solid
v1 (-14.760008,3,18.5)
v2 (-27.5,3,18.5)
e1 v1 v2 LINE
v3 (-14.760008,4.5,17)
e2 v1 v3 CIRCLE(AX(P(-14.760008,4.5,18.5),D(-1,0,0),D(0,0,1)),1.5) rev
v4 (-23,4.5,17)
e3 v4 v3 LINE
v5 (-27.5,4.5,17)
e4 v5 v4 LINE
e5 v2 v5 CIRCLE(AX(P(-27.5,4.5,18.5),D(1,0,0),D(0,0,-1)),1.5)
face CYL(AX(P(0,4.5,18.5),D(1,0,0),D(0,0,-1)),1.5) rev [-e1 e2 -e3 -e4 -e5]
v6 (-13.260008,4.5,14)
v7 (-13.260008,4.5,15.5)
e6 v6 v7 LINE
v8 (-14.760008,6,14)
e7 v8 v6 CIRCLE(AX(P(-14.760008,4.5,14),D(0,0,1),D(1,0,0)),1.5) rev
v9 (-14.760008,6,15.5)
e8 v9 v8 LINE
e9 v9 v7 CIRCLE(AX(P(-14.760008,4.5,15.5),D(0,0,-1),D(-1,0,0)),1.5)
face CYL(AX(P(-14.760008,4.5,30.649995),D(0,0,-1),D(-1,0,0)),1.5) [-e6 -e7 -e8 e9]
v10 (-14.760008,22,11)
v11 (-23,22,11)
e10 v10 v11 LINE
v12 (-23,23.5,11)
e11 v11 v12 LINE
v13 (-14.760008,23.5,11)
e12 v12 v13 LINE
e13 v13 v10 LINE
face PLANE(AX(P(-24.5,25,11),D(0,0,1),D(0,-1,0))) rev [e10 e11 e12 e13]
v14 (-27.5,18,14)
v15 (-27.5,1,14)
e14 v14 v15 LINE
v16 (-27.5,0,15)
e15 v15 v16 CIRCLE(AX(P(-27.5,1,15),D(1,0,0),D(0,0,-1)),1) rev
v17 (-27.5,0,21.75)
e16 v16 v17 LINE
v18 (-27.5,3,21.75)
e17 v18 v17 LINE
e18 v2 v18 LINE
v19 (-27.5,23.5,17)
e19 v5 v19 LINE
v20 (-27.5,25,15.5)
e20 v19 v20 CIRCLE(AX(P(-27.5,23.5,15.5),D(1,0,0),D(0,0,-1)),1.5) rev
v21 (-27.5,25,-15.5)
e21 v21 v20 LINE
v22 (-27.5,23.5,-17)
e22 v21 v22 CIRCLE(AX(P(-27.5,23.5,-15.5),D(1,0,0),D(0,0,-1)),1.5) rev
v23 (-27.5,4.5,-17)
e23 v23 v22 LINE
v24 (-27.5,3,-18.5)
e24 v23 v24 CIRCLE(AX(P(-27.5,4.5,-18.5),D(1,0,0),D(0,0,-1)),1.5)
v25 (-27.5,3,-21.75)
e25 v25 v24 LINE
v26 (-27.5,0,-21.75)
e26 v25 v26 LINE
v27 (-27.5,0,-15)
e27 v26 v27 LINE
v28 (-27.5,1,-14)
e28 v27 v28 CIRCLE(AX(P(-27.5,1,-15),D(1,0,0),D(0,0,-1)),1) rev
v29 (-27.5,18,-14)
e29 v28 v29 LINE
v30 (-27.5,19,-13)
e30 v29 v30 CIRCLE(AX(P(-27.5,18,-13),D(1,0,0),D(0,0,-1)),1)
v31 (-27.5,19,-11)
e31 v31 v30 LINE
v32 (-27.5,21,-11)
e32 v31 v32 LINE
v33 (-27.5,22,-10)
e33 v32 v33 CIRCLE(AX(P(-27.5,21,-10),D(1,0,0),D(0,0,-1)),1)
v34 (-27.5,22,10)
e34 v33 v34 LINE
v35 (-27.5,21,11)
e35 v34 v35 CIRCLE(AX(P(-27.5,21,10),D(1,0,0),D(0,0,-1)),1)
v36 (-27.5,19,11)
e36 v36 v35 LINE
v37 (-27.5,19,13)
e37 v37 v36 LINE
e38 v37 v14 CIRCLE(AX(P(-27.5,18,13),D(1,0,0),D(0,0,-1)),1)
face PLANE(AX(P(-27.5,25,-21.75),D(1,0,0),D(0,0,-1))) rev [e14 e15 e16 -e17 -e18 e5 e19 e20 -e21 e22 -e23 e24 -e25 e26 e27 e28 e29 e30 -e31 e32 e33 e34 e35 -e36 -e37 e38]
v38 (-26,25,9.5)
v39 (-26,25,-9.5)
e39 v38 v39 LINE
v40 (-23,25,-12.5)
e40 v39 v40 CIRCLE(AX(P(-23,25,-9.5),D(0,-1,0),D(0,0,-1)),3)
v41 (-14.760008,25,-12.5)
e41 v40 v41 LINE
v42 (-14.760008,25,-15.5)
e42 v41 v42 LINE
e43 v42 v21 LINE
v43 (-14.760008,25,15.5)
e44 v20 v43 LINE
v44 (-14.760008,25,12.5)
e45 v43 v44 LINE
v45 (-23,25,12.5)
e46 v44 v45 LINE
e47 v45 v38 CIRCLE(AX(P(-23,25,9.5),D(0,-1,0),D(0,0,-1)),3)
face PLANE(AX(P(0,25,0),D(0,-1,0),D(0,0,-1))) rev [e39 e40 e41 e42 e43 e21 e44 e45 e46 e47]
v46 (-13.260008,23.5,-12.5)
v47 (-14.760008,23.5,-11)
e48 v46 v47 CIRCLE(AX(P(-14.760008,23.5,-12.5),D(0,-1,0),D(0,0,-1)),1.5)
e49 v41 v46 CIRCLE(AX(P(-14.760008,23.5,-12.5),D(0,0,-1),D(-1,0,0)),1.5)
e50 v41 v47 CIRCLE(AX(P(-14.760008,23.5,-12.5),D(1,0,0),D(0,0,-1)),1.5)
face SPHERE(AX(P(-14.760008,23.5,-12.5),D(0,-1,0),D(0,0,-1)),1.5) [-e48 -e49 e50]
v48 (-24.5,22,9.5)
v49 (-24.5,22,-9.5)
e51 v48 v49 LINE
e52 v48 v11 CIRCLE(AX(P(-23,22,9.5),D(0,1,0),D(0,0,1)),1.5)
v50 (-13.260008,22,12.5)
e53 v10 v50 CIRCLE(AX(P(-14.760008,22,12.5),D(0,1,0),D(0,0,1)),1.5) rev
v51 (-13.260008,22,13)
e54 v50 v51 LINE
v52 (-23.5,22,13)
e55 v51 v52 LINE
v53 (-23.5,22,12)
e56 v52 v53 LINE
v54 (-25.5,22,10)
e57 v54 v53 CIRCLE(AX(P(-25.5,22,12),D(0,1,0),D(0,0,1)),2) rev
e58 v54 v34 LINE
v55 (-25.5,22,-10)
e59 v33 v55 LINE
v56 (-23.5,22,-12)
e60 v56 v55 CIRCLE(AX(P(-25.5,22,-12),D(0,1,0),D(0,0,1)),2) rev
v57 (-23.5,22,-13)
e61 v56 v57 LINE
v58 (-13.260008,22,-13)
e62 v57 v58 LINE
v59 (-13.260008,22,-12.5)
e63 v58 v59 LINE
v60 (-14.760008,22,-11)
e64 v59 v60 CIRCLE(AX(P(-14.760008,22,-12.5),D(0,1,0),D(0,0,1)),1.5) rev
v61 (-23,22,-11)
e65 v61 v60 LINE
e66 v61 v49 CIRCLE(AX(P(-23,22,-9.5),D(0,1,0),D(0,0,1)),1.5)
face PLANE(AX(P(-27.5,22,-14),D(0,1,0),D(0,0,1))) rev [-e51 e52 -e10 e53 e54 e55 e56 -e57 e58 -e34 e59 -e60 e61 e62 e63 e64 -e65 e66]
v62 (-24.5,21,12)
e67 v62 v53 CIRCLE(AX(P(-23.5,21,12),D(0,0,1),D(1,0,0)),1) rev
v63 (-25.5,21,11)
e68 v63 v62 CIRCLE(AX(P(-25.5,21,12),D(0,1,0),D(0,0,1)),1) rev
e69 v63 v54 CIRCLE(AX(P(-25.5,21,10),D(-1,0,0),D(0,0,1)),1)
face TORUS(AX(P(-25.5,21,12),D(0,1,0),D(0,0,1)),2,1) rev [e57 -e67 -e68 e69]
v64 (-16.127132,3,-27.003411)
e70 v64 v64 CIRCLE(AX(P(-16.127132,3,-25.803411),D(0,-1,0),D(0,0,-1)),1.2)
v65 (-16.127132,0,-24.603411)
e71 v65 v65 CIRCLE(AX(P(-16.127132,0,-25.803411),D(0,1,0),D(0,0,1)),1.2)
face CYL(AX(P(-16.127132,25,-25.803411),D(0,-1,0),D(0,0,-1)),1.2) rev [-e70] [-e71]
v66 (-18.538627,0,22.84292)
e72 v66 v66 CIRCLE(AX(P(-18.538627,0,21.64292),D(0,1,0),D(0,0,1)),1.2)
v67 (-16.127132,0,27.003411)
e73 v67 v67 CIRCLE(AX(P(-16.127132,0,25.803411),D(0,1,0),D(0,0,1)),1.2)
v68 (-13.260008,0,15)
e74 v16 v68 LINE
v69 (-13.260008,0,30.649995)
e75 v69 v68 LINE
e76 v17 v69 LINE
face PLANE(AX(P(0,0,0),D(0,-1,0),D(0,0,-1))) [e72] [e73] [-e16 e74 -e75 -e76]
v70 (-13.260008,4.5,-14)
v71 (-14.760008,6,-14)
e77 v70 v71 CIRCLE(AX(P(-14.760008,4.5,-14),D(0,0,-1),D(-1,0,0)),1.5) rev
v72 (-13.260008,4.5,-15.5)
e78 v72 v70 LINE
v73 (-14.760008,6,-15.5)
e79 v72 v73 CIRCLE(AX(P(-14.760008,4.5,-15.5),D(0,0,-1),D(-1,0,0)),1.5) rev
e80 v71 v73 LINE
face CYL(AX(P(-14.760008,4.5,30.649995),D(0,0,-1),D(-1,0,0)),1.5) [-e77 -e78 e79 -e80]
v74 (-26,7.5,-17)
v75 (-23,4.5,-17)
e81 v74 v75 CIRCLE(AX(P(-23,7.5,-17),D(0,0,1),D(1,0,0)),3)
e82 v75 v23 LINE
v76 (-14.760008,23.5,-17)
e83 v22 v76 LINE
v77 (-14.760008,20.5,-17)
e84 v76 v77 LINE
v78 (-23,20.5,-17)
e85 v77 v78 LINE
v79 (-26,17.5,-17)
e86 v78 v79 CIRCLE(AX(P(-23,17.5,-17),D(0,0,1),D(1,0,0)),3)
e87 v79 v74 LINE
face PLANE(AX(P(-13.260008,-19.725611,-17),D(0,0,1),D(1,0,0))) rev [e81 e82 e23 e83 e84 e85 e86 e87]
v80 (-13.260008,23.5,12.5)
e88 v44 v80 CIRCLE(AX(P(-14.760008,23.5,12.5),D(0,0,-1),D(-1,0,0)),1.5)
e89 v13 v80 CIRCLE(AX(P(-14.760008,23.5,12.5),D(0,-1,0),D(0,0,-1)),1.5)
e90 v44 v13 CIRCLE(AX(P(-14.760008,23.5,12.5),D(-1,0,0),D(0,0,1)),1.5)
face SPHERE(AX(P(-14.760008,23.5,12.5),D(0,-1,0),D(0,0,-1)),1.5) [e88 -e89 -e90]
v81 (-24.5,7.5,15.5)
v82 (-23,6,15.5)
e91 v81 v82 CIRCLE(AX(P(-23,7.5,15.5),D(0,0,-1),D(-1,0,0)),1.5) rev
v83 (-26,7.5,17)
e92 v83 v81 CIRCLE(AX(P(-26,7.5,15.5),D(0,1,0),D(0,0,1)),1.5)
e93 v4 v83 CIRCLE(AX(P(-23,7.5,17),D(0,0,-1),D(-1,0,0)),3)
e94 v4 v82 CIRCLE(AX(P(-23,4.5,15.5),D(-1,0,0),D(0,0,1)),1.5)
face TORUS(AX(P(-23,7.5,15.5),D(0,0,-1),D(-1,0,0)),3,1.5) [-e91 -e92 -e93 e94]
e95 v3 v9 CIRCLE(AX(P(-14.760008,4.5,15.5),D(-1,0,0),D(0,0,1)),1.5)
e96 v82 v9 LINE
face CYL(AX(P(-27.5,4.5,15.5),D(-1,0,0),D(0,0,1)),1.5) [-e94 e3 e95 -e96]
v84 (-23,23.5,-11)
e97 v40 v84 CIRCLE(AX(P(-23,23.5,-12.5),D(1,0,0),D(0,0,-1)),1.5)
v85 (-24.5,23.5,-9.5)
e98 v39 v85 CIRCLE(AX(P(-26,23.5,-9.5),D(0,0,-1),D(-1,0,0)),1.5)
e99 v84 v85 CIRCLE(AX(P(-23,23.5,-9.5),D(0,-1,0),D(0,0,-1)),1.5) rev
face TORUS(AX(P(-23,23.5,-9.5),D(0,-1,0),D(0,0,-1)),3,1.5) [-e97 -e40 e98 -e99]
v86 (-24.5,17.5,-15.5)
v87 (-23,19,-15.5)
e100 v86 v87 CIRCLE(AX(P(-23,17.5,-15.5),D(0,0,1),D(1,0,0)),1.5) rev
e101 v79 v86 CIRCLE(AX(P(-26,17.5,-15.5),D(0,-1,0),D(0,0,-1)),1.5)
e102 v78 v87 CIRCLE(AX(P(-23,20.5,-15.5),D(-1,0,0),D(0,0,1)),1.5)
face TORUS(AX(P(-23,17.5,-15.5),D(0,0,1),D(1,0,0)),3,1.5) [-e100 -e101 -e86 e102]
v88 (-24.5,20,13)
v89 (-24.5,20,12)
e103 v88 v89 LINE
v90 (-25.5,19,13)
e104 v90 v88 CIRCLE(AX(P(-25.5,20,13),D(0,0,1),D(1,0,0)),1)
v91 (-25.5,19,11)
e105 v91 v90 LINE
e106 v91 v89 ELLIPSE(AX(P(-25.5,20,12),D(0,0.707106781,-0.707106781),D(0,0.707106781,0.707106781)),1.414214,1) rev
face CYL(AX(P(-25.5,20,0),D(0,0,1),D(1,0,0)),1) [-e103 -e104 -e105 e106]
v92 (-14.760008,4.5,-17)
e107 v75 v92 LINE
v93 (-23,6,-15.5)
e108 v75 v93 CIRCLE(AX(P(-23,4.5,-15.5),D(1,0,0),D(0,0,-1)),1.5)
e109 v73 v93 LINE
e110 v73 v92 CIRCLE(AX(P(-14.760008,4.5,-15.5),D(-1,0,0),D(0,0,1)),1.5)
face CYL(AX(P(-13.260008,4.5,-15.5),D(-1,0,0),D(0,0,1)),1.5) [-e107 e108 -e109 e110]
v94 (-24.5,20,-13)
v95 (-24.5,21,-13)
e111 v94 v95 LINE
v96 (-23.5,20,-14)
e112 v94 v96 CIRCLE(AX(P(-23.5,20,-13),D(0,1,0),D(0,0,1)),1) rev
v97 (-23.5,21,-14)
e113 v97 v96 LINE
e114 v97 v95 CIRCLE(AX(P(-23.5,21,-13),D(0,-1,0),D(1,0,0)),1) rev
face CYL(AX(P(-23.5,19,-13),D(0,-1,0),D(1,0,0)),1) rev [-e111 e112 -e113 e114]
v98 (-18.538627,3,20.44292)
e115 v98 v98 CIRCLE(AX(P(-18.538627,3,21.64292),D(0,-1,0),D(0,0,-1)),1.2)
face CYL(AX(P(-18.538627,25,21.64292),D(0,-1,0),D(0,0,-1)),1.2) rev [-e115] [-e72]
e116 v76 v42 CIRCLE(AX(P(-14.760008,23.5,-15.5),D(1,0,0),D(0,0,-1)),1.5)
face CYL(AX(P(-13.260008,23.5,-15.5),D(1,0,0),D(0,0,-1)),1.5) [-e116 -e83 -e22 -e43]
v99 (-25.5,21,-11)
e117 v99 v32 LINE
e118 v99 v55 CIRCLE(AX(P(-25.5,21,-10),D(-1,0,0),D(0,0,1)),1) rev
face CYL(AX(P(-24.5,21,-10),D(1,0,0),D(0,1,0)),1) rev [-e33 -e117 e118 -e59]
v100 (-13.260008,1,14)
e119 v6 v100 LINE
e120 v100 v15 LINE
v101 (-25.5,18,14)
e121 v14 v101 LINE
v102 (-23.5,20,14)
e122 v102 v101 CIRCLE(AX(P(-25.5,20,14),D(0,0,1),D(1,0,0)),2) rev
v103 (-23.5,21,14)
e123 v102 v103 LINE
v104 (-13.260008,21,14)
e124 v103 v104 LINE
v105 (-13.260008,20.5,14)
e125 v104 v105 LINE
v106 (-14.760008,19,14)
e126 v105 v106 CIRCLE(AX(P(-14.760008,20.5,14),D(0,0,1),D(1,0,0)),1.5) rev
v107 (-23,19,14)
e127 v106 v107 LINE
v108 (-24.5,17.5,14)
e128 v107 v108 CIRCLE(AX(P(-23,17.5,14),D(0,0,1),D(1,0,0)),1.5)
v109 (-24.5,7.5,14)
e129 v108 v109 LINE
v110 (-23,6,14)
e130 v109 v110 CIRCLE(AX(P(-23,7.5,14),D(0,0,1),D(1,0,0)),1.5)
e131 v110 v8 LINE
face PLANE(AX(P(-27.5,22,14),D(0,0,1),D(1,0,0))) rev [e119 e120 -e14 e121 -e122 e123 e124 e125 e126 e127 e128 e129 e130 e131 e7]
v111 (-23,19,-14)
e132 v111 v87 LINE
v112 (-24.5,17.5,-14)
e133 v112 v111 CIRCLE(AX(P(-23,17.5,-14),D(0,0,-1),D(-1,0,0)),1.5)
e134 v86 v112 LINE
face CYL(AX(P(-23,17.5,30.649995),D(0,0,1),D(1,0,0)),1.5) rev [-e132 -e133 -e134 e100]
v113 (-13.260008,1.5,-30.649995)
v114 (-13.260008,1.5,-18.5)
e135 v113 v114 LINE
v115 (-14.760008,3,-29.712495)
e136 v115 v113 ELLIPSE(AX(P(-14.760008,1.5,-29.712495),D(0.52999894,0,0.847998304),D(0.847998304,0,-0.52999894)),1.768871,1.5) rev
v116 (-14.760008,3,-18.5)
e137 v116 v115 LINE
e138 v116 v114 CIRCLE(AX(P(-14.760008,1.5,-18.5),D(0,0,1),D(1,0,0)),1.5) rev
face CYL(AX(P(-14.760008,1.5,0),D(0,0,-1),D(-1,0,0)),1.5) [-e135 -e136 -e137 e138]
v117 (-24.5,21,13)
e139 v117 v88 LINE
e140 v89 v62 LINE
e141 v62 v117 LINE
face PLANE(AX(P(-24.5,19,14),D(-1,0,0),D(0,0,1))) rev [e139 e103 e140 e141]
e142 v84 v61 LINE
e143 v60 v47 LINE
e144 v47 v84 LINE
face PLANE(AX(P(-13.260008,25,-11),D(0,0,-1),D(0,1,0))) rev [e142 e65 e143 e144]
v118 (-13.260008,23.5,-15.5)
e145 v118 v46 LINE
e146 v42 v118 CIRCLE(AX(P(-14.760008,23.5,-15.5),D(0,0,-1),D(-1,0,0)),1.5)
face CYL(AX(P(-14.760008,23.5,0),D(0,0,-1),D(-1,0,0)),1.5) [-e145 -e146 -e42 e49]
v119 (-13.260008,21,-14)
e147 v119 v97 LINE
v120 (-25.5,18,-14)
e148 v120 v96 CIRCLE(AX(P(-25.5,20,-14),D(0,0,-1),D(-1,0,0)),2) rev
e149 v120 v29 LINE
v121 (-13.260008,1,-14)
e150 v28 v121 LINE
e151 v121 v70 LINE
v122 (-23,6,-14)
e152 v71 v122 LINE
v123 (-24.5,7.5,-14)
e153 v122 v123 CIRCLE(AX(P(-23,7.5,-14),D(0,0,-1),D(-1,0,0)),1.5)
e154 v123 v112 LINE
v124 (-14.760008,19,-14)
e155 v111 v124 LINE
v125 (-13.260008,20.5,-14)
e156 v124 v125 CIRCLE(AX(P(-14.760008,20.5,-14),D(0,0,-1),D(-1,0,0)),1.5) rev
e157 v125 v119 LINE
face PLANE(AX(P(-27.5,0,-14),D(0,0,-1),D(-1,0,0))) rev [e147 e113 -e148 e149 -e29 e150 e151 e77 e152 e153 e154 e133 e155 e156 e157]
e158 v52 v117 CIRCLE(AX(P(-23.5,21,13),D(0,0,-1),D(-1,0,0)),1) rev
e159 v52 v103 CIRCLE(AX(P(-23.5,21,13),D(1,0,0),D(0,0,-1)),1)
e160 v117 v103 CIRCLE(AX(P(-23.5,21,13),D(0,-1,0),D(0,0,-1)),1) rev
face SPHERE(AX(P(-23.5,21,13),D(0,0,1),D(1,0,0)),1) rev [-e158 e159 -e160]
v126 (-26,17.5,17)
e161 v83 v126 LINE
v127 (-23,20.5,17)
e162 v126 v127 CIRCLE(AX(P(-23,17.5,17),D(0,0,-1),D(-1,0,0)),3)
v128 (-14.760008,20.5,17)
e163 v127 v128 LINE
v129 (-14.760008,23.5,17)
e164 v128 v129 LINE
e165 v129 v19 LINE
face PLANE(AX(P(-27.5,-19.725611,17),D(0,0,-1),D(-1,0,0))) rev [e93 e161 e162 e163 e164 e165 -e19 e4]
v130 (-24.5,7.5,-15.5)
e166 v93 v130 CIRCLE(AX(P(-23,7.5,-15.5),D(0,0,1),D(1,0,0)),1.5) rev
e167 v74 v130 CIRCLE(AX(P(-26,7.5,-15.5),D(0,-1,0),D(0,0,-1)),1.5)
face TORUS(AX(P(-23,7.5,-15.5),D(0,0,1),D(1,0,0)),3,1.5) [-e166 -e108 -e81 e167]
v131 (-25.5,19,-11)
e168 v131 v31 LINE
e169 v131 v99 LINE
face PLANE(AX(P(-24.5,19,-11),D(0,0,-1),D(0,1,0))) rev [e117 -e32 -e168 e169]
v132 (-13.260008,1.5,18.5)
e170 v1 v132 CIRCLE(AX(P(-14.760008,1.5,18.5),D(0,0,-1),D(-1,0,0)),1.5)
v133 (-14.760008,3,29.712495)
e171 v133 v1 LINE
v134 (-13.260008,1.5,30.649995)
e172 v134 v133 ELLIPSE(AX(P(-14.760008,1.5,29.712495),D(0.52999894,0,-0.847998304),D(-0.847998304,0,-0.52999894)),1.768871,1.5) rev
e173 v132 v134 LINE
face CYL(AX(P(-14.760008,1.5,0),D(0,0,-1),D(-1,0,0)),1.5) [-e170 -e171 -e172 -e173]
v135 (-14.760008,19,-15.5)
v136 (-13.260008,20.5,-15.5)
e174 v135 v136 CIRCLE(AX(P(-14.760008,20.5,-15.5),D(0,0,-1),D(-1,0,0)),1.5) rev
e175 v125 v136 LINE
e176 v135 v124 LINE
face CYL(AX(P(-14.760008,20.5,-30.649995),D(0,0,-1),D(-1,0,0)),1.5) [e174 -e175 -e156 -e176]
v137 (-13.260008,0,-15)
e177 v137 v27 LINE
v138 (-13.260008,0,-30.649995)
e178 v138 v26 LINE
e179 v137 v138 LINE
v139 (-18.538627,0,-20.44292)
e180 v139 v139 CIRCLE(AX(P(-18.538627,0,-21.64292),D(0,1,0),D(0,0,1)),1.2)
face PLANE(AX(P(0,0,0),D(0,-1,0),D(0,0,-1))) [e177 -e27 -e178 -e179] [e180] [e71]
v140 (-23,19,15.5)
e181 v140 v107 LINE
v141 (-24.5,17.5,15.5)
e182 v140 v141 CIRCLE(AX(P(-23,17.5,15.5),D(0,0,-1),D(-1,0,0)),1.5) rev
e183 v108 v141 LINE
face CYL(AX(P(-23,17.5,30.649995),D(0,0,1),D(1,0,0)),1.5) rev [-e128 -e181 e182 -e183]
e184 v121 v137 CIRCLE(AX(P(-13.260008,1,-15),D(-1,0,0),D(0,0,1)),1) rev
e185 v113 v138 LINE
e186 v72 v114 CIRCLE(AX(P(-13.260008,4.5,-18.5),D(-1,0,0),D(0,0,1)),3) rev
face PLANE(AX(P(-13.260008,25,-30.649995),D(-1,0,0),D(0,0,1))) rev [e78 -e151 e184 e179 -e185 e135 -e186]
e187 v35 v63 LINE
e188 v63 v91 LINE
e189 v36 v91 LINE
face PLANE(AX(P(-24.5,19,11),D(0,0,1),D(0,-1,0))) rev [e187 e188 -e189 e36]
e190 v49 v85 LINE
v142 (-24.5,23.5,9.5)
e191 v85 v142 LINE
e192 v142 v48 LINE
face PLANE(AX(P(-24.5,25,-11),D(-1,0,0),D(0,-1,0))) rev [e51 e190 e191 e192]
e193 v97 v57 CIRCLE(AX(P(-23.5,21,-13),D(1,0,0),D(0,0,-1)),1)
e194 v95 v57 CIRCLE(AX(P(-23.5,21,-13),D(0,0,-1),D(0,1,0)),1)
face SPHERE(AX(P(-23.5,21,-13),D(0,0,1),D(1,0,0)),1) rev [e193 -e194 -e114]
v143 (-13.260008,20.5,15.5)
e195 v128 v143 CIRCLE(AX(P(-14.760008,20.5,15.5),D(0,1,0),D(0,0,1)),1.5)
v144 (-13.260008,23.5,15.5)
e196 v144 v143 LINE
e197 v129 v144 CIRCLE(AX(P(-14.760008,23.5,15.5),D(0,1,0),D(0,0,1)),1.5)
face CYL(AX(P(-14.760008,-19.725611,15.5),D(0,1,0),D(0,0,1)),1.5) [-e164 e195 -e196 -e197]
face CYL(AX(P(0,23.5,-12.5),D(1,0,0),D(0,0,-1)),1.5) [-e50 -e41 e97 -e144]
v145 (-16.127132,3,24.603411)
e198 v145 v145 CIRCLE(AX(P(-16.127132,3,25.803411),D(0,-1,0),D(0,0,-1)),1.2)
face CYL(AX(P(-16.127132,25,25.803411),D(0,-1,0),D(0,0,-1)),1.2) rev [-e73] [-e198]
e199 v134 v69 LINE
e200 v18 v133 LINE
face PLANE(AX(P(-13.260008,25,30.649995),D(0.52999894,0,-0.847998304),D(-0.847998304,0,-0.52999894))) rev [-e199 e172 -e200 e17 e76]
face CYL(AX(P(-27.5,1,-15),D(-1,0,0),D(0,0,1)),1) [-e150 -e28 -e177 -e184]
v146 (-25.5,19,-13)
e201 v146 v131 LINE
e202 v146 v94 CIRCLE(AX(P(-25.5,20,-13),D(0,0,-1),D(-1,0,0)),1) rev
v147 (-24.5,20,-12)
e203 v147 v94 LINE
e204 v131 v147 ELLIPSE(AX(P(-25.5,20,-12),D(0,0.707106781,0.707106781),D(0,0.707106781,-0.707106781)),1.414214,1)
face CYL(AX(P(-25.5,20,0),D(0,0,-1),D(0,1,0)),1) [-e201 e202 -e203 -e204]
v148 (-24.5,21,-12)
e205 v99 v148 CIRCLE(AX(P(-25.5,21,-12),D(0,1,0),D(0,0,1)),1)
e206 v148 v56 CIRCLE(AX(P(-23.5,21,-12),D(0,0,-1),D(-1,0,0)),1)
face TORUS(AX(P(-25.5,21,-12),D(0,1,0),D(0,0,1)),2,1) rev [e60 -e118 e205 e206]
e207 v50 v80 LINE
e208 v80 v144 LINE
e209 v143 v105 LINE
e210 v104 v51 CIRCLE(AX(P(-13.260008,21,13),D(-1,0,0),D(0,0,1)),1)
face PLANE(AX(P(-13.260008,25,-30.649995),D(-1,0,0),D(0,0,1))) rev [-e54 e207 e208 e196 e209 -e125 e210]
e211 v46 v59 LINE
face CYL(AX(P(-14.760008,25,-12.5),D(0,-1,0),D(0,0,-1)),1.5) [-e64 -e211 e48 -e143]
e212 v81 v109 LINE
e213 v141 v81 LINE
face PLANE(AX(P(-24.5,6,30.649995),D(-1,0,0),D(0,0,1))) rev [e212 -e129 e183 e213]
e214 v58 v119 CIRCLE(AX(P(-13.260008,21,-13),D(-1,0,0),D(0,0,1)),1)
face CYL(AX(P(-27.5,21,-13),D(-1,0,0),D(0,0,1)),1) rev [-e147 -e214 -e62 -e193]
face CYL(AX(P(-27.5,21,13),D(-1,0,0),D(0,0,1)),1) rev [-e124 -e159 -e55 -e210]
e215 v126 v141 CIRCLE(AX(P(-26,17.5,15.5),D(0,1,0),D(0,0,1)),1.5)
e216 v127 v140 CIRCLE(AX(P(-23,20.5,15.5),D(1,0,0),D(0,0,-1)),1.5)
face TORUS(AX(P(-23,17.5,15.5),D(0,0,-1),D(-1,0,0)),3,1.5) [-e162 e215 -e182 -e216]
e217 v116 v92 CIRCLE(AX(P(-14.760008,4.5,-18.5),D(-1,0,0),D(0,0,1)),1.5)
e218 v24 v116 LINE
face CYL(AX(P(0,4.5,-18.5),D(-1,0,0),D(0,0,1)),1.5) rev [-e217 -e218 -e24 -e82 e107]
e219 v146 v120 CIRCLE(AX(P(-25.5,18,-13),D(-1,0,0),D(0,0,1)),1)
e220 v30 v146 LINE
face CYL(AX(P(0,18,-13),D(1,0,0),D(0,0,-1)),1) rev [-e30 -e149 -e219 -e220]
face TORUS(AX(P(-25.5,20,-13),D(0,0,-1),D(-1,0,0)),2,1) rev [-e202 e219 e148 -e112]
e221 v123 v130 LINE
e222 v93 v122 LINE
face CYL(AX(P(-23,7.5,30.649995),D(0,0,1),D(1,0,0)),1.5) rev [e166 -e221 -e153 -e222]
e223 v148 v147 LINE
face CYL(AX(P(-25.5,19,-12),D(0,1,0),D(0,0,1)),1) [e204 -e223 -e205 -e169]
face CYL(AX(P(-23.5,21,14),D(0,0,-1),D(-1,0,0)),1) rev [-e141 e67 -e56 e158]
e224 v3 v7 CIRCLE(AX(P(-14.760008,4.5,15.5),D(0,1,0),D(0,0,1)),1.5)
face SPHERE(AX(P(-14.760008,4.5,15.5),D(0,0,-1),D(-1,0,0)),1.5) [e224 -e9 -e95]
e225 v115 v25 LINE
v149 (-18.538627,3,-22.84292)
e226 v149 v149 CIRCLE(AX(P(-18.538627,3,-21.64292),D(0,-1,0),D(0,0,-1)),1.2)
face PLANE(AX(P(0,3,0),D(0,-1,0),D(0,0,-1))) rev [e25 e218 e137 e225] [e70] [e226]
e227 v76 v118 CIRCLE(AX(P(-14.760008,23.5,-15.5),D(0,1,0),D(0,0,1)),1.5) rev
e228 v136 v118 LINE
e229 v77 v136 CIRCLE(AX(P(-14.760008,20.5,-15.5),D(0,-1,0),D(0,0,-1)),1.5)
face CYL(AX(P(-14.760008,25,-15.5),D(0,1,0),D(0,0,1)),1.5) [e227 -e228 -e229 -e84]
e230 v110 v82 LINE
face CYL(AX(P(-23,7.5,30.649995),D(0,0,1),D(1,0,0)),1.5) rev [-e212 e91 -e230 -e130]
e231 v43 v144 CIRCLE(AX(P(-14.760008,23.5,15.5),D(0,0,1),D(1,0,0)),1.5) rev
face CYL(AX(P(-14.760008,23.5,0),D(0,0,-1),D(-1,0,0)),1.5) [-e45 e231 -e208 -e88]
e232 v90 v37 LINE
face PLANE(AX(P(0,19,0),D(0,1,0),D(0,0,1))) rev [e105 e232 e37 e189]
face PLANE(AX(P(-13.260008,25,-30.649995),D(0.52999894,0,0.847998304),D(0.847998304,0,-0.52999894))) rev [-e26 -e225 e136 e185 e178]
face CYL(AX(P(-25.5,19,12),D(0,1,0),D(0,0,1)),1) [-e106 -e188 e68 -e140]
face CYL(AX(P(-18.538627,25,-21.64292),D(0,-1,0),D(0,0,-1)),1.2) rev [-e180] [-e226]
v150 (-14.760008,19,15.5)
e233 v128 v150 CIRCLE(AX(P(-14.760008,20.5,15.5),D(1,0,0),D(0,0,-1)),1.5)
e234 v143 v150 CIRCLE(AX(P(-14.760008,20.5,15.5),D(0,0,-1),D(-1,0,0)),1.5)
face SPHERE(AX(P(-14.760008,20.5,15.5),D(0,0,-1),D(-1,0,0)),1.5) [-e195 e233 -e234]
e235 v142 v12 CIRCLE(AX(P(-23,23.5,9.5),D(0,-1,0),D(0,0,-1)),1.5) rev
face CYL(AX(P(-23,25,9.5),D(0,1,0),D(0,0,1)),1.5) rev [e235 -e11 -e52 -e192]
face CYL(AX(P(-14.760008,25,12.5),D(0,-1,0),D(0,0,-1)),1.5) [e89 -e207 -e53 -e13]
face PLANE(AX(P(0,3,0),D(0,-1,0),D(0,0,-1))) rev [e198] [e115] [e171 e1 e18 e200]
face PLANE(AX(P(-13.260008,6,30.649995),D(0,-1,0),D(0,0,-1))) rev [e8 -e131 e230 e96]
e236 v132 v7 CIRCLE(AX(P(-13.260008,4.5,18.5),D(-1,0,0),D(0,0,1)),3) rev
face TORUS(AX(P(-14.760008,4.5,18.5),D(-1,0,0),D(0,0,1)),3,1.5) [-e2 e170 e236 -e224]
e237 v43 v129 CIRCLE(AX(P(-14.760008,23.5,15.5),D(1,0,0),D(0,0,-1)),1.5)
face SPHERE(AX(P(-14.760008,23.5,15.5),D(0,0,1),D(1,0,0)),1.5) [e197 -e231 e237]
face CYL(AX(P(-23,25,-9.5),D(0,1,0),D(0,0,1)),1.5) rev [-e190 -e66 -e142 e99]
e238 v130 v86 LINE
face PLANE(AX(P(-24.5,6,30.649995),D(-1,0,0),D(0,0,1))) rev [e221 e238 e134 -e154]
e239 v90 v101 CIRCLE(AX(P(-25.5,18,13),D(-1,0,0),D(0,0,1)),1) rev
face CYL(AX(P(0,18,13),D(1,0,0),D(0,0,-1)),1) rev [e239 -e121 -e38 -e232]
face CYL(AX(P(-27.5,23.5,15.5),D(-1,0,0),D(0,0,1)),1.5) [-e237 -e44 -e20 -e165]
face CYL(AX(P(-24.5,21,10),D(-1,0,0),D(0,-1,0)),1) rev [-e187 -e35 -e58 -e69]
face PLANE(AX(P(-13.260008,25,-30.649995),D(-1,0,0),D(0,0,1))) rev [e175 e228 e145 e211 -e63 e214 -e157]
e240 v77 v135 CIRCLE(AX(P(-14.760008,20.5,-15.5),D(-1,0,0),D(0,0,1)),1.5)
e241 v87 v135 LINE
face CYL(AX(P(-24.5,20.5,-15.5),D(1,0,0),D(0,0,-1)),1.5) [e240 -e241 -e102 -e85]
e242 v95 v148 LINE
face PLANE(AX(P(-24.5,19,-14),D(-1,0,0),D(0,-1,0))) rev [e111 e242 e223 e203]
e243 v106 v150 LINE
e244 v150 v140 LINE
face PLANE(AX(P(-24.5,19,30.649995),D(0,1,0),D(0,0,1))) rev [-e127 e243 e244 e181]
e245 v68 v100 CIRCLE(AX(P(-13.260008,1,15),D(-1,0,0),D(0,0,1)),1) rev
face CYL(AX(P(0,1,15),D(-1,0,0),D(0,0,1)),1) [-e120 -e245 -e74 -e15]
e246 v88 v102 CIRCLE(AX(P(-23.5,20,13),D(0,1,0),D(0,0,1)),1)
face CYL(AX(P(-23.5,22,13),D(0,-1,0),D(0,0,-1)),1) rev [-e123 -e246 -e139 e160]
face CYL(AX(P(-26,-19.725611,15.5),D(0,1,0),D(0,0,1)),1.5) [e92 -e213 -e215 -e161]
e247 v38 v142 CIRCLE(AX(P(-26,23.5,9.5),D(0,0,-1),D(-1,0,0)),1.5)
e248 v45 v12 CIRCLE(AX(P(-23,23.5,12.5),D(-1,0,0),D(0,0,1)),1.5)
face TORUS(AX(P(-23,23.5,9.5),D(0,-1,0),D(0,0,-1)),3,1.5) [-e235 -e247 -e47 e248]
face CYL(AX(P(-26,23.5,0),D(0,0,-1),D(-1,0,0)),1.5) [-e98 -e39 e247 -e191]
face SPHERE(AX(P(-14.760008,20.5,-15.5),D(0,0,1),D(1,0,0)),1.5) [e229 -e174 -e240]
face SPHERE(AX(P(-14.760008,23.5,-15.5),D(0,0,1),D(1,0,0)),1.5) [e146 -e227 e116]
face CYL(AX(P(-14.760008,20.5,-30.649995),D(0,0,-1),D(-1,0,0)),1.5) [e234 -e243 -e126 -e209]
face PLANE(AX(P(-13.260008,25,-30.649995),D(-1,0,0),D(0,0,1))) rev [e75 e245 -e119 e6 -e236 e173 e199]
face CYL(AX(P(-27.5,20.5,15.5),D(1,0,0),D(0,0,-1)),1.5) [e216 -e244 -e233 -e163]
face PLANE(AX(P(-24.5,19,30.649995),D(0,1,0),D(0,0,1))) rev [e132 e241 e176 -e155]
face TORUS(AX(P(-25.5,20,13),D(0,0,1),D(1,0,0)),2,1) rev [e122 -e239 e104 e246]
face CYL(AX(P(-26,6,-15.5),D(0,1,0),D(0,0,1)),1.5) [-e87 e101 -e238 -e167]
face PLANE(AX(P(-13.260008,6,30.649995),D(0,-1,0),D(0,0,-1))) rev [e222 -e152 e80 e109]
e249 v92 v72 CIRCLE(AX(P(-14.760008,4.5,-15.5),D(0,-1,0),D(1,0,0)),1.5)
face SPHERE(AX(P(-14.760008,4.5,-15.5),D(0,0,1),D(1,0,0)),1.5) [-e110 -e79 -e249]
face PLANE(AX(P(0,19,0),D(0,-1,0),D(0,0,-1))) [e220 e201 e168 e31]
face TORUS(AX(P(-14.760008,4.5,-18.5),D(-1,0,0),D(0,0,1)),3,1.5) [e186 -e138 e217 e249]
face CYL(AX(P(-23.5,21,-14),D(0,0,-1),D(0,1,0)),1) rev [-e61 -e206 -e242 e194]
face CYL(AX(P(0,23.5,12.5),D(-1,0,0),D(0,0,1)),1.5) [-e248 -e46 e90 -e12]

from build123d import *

# Parameters (mm, degrees)
SKETCH3_R           = 1.2
BOSS_EXTRUDE1_DEPTH = 25
SKETCH5_W           = 28
SKETCH5_H           = 22
CUT_EXTRUDE1_DEPTH  = 43.03807243
CUT_EXTRUDE2_DEPTH  = 22
SKETCH8_W           = 3
SKETCH8_H           = 3
BOSS_EXTRUDE2_DEPTH = 3
SKETCH9_W           = 11.23999152
SKETCH9_H           = 22
CUT_EXTRUDE3_DEPTH  = 47.686959369
SKETCH10_W          = 11.23999152
SKETCH10_H          = 13
CUT_EXTRUDE4_DEPTH  = 61.429893223
FILLET1_START       = -17
FILLET1_DEPTH       = 3
FILLET1_START_2     = 14
FILLET1_2_DEPTH     = 3
FILLET1_START_3     = 22
FILLET1_3_DEPTH     = 3
FILLET1_START_4     = -30.6499947
FILLET1_4_DEPTH     = 61.2999894
FILLET1_START_5     = 19.56628
FILLET1_5_DEPTH     = 6.43372
FILLET2_R           = 1
FILLET3_R           = 1
FILLET4_R           = 1.5


with BuildPart() as part:
    # Sketch3 → Boss-Extrude1 (new body)
    with BuildSketch(Plane(origin=(0, 0, 0), x_dir=(1, 0, 0), z_dir=(0, 1, 0))):
        Polygon((-13.26000848, 30.6499947), (-27.5, 21.75), (-27.5, -21.75), (-13.26000848, -30.6499947), align=None)
        with Locations(Location((-18.538627315, 21.642919742, 0), (0, 0, 270))):
            Circle(SKETCH3_R, mode=Mode.SUBTRACT)
        with Locations(Location((-16.127132138, 25.803411421, 0), (0, 0, 270))):
            Circle(SKETCH3_R, mode=Mode.SUBTRACT)
        with Locations(Location((-18.538627315, -21.642919742, 0), (0, 0, 270))):
            Circle(SKETCH3_R, mode=Mode.SUBTRACT)
        with Locations(Location((-16.127132138, -25.803411421, 0), (0, 0, 270))):
            Circle(SKETCH3_R, mode=Mode.SUBTRACT)
    extrude(amount=BOSS_EXTRUDE1_DEPTH)

    # Sketch5 → Cut-Extrude1 (cut, through all)
    with BuildSketch(Plane(origin=(-13.26000848, 0, 0), x_dir=(0, 0, -1), z_dir=(1, 0, 0))):
        with Locations((0, 11)):
            Rectangle(SKETCH5_W, SKETCH5_H)
    extrude(amount=-CUT_EXTRUDE1_DEPTH, mode=Mode.SUBTRACT)

    # Sketch6 → Cut-Extrude2 (cut)
    with BuildSketch(Plane(origin=(0, 25, 0), x_dir=(1, 0, 0), z_dir=(0, 1, 0))):
        Polygon((-13.26000848, -30.6499947), (-27.5, -21.75), (-27.5, -17), (-13.26000848, -17), align=None)
        Polygon((-27.5, 17), (-27.5, 21.75), (-13.26000848, 30.6499947), (-13.26000848, 17), align=None)
    extrude(amount=-CUT_EXTRUDE2_DEPTH, mode=Mode.SUBTRACT)

    # Sketch8 → Boss-Extrude2 (add)
    with BuildSketch(Plane.XZ.offset(-22)):
        with Locations((-26, -12.5)):
            Rectangle(SKETCH8_W, SKETCH8_H)
        with Locations((-26, 12.5)):
            Rectangle(SKETCH8_W, SKETCH8_H)
    extrude(amount=BOSS_EXTRUDE2_DEPTH)

    # Sketch9 → Cut-Extrude3 (cut, through all)
    with BuildSketch(Plane.XZ.offset(-22)):
        with Locations((-18.88000424, 0)):
            Rectangle(SKETCH9_W, SKETCH9_H)
    extrude(amount=-CUT_EXTRUDE3_DEPTH, mode=Mode.SUBTRACT)

    # Sketch10 → Cut-Extrude4 (cut, through all)
    with BuildSketch(Plane(origin=(0, 0, -17), x_dir=(-1, 0, 0), z_dir=(0, 0, -1))):
        with Locations((18.88000424, 12.5)):
            Rectangle(SKETCH10_W, SKETCH10_H)
    extrude(amount=-CUT_EXTRUDE4_DEPTH, mode=Mode.SUBTRACT)

    # Fillet1: read off the stored shape, not the designer's step
    # Fillet1 outline → Fillet1 (add)
    with BuildSketch(Plane.XY.offset(FILLET1_START)):
        with BuildLine():
            Line((-24.5, 19), (-24.5, 17.5))
            ThreePointArc((-24.5, 17.5), (-24.060660172, 18.560660172), (-23, 19))
            Line((-23, 19), (-24.5, 19))
        make_face()
        with BuildLine():
            Line((-24.5, 6), (-23, 6))
            ThreePointArc((-23, 6), (-24.060660172, 6.439339828), (-24.5, 7.5))
            Line((-24.5, 7.5), (-24.5, 6))
        make_face()
    extrude(amount=FILLET1_DEPTH)

    # Fillet1 2 outline → Fillet1 2 (add)
    with BuildSketch(Plane.XY.offset(FILLET1_START_2)):
        with BuildLine():
            Line((-24.5, 19), (-24.5, 17.5))
            ThreePointArc((-24.5, 17.5), (-24.060660172, 18.560660172), (-23, 19))
            Line((-23, 19), (-24.5, 19))
        make_face()
        with BuildLine():
            Line((-24.5, 6), (-23, 6))
            ThreePointArc((-23, 6), (-24.060660172, 6.439339828), (-24.5, 7.5))
            Line((-24.5, 7.5), (-24.5, 6))
        make_face()
    extrude(amount=FILLET1_2_DEPTH)

    # Fillet1 3 outline → Fillet1 3 (add)
    with BuildSketch(Plane(origin=(0, 0, 0), x_dir=(1, 0, 0), z_dir=(0, 1, 0)).offset(FILLET1_START_3)):
        with BuildLine():
            ThreePointArc((-23, -11), (-24.060660172, -10.560660172), (-24.5, -9.5))
            Line((-24.5, -9.5), (-24.5, -11))
            Line((-24.5, -11), (-23, -11))
        make_face()
        with BuildLine():
            ThreePointArc((-24.5, 9.5), (-24.060660172, 10.560660172), (-23, 11))
            Line((-23, 11), (-24.5, 11))
            Line((-24.5, 11), (-24.5, 9.5))
        make_face()
    extrude(amount=FILLET1_3_DEPTH)

    # Fillet1 4 outline → Fillet1 4 (cut)
    with BuildSketch(Plane.XY.offset(FILLET1_START_4)):
        with BuildLine():
            Line((-13.26000848, 6), (-14.76000848, 6))
            ThreePointArc((-14.76000848, 6), (-13.699348308, 5.560660172), (-13.26000848, 4.5))
            Line((-13.26000848, 4.5), (-13.26000848, 6))
        make_face()
        with BuildLine():
            ThreePointArc((-13.26000848, 20.5), (-13.699348308, 19.439339828), (-14.76000848, 19))
            Line((-14.76000848, 19), (-13.26000848, 19))
            Line((-13.26000848, 19), (-13.26000848, 20.5))
        make_face()
    extrude(amount=FILLET1_4_DEPTH, mode=Mode.SUBTRACT)

    # Fillet1 5 outline → Fillet1 5 (cut)
    with BuildSketch(Plane(origin=(0, 0, 0), x_dir=(1, 0, 0), z_dir=(0, 1, 0)).offset(FILLET1_START_5)):
        with BuildLine():
            Line((-13.26000848, 11), (-13.26000848, 12.5))
            ThreePointArc((-13.26000848, 12.5), (-13.699348308, 11.439339828), (-14.76000848, 11))
            Line((-14.76000848, 11), (-13.26000848, 11))
        make_face()
        with BuildLine():
            Line((-13.26000848, -11), (-14.76000848, -11))
            ThreePointArc((-14.76000848, -11), (-13.699348308, -11.439339828), (-13.26000848, -12.5))
            Line((-13.26000848, -12.5), (-13.26000848, -11))
        make_face()
    extrude(amount=FILLET1_5_DEPTH, mode=Mode.SUBTRACT)

    # Fillet2
    fillet2_edges = [part.edges().sort_by_distance(p)[0] for p in [
        (-24.5, 22, -12.5),
        (-24.5, 20.5, -14),
        (-26, 22, -11),
        (-24.5, 20.5, -11),
        (-26, 19, -14),
        (-24.5, 19, -12.5),
        (-24.5, 20.5, 14),
        (-26, 22, 11),
        (-24.5, 22, 12.5),
        (-24.5, 20.5, 11),
        (-26, 19, 14),
        (-24.5, 19, 12.5),
    ]]
    fillet(fillet2_edges, radius=FILLET2_R)

    # Fillet3
    # the kernel refuses this fillet: 1 mm, written as the material it adds along each edge
    with BuildSketch(Plane(origin=(-23.5, 21, 13), x_dir=(0, 1, 0), z_dir=(0, 0, 1))) as fillet3_piece_1_section:
        Polygon((0, 0), (FILLET3_R, 0), (FILLET3_R, FILLET3_R), (0, FILLET3_R), align=None)
    fillet3_piece_1 = extrude(amount=FILLET3_R, mode=Mode.PRIVATE)
    fillet3_piece_1 = fillet3_piece_1 - Plane(origin=(-23.5, 21, 13), x_dir=(0.7071067811865475, -0.7071067811865475, 0), z_dir=(0, 0, 1)) * Sphere(FILLET3_R, mode=Mode.PRIVATE)
    add(fillet3_piece_1)
    with BuildSketch(Plane(origin=(-23.5, 21, -13), x_dir=(0, 0, -1), z_dir=(0, 1, 0))) as fillet3_piece_2_section:
        Polygon((0, 0), (FILLET3_R, 0), (FILLET3_R, FILLET3_R), (0, FILLET3_R), align=None)
    fillet3_piece_2 = extrude(amount=FILLET3_R, mode=Mode.PRIVATE)
    fillet3_piece_2 = fillet3_piece_2 - Plane(origin=(-23.5, 21, -13), x_dir=(0.7071067811865691, 0, 0.707106781186526), z_dir=(0, 1, 0)) * Sphere(FILLET3_R, mode=Mode.PRIVATE)
    add(fillet3_piece_2)
    with BuildSketch(Plane(origin=(-13.26000848, 22, 14), x_dir=(0, -1, 0), z_dir=(-1, 0, 0)), Plane(origin=(-13.26000848, 22, -14), x_dir=(0, 0, 1), z_dir=(-1, 0, 0))) as fillet3_piece_3:
        with BuildLine():
            CenterArc((FILLET3_R, -FILLET3_R), FILLET3_R, 90, 90)
            Line((0, -FILLET3_R), (0, 0))
            Line((0, 0), (FILLET3_R, 0))
        make_face()
    extrude(amount=10.23999152)
    # the kernel refuses this fillet: 1 mm, written as the material it takes off along each edge
    with BuildSketch(Plane(origin=(-10.76000848, 0, 14), x_dir=(0, 1, 0), z_dir=(-1, 0, 0)), Plane(origin=(-10.76000848, 0, -14), x_dir=(0, 0, -1), z_dir=(-1, 0, 0))) as fillet3_2_piece_1:
        with BuildLine():
            CenterArc((FILLET3_R, -FILLET3_R), FILLET3_R, 90, 90)
            Line((0, -FILLET3_R), (0, 0))
            Line((0, 0), (FILLET3_R, 0))
        make_face()
    extrude(amount=19.23999152, mode=Mode.SUBTRACT)

    # Fillet4
    fillet4_edges = [part.edges().sort_by_distance(p)[0] for p in [
        (-13.26000848, 3, -23.82499735),
        (-13.26000848, 3, 23.82499735),
        (-13.699348308, 5.560660172, -17),
        (-18.88000424, 6, -17),
        (-24.060660172, 6.439339828, -17),
        (-24.5, 12.5, -17),
        (-24.060660172, 18.560660172, -17),
        (-18.88000424, 19, -17),
        (-13.699348308, 19.439339828, -17),
        (-13.26000848, 25, -14.75),
        (-13.699348308, 25, -11.439339828),
        (-18.88000424, 25, -11),
        (-24.060660172, 25, -10.560660172),
        (-24.5, 25, 0),
        (-24.060660172, 25, 10.560660172),
        (-18.88000424, 25, 11),
        (-13.699348308, 25, 11.439339828),
        (-13.699348308, 5.560660172, 17),
        (-18.88000424, 6, 17),
        (-24.060660172, 6.439339828, 17),
        (-24.5, 12.5, 17),
        (-24.060660172, 18.560660172, 17),
        (-18.88000424, 19, 17),
        (-13.699348308, 19.439339828, 17),
        (-20.38000424, 3, 17),
        (-20.38000424, 3, -17),
        (-13.26000848, 22.75, -17),
        (-13.26000848, 25, 14.75),
        (-13.26000848, 22.75, 17),
        (-20.38000424, 25, 17),
        (-20.38000424, 25, -17),
    ]]
    fillet(fillet4_edges, radius=FILLET4_R - 0.0001)  # a hair under: the kernel refuses the full size


solid = part.part
